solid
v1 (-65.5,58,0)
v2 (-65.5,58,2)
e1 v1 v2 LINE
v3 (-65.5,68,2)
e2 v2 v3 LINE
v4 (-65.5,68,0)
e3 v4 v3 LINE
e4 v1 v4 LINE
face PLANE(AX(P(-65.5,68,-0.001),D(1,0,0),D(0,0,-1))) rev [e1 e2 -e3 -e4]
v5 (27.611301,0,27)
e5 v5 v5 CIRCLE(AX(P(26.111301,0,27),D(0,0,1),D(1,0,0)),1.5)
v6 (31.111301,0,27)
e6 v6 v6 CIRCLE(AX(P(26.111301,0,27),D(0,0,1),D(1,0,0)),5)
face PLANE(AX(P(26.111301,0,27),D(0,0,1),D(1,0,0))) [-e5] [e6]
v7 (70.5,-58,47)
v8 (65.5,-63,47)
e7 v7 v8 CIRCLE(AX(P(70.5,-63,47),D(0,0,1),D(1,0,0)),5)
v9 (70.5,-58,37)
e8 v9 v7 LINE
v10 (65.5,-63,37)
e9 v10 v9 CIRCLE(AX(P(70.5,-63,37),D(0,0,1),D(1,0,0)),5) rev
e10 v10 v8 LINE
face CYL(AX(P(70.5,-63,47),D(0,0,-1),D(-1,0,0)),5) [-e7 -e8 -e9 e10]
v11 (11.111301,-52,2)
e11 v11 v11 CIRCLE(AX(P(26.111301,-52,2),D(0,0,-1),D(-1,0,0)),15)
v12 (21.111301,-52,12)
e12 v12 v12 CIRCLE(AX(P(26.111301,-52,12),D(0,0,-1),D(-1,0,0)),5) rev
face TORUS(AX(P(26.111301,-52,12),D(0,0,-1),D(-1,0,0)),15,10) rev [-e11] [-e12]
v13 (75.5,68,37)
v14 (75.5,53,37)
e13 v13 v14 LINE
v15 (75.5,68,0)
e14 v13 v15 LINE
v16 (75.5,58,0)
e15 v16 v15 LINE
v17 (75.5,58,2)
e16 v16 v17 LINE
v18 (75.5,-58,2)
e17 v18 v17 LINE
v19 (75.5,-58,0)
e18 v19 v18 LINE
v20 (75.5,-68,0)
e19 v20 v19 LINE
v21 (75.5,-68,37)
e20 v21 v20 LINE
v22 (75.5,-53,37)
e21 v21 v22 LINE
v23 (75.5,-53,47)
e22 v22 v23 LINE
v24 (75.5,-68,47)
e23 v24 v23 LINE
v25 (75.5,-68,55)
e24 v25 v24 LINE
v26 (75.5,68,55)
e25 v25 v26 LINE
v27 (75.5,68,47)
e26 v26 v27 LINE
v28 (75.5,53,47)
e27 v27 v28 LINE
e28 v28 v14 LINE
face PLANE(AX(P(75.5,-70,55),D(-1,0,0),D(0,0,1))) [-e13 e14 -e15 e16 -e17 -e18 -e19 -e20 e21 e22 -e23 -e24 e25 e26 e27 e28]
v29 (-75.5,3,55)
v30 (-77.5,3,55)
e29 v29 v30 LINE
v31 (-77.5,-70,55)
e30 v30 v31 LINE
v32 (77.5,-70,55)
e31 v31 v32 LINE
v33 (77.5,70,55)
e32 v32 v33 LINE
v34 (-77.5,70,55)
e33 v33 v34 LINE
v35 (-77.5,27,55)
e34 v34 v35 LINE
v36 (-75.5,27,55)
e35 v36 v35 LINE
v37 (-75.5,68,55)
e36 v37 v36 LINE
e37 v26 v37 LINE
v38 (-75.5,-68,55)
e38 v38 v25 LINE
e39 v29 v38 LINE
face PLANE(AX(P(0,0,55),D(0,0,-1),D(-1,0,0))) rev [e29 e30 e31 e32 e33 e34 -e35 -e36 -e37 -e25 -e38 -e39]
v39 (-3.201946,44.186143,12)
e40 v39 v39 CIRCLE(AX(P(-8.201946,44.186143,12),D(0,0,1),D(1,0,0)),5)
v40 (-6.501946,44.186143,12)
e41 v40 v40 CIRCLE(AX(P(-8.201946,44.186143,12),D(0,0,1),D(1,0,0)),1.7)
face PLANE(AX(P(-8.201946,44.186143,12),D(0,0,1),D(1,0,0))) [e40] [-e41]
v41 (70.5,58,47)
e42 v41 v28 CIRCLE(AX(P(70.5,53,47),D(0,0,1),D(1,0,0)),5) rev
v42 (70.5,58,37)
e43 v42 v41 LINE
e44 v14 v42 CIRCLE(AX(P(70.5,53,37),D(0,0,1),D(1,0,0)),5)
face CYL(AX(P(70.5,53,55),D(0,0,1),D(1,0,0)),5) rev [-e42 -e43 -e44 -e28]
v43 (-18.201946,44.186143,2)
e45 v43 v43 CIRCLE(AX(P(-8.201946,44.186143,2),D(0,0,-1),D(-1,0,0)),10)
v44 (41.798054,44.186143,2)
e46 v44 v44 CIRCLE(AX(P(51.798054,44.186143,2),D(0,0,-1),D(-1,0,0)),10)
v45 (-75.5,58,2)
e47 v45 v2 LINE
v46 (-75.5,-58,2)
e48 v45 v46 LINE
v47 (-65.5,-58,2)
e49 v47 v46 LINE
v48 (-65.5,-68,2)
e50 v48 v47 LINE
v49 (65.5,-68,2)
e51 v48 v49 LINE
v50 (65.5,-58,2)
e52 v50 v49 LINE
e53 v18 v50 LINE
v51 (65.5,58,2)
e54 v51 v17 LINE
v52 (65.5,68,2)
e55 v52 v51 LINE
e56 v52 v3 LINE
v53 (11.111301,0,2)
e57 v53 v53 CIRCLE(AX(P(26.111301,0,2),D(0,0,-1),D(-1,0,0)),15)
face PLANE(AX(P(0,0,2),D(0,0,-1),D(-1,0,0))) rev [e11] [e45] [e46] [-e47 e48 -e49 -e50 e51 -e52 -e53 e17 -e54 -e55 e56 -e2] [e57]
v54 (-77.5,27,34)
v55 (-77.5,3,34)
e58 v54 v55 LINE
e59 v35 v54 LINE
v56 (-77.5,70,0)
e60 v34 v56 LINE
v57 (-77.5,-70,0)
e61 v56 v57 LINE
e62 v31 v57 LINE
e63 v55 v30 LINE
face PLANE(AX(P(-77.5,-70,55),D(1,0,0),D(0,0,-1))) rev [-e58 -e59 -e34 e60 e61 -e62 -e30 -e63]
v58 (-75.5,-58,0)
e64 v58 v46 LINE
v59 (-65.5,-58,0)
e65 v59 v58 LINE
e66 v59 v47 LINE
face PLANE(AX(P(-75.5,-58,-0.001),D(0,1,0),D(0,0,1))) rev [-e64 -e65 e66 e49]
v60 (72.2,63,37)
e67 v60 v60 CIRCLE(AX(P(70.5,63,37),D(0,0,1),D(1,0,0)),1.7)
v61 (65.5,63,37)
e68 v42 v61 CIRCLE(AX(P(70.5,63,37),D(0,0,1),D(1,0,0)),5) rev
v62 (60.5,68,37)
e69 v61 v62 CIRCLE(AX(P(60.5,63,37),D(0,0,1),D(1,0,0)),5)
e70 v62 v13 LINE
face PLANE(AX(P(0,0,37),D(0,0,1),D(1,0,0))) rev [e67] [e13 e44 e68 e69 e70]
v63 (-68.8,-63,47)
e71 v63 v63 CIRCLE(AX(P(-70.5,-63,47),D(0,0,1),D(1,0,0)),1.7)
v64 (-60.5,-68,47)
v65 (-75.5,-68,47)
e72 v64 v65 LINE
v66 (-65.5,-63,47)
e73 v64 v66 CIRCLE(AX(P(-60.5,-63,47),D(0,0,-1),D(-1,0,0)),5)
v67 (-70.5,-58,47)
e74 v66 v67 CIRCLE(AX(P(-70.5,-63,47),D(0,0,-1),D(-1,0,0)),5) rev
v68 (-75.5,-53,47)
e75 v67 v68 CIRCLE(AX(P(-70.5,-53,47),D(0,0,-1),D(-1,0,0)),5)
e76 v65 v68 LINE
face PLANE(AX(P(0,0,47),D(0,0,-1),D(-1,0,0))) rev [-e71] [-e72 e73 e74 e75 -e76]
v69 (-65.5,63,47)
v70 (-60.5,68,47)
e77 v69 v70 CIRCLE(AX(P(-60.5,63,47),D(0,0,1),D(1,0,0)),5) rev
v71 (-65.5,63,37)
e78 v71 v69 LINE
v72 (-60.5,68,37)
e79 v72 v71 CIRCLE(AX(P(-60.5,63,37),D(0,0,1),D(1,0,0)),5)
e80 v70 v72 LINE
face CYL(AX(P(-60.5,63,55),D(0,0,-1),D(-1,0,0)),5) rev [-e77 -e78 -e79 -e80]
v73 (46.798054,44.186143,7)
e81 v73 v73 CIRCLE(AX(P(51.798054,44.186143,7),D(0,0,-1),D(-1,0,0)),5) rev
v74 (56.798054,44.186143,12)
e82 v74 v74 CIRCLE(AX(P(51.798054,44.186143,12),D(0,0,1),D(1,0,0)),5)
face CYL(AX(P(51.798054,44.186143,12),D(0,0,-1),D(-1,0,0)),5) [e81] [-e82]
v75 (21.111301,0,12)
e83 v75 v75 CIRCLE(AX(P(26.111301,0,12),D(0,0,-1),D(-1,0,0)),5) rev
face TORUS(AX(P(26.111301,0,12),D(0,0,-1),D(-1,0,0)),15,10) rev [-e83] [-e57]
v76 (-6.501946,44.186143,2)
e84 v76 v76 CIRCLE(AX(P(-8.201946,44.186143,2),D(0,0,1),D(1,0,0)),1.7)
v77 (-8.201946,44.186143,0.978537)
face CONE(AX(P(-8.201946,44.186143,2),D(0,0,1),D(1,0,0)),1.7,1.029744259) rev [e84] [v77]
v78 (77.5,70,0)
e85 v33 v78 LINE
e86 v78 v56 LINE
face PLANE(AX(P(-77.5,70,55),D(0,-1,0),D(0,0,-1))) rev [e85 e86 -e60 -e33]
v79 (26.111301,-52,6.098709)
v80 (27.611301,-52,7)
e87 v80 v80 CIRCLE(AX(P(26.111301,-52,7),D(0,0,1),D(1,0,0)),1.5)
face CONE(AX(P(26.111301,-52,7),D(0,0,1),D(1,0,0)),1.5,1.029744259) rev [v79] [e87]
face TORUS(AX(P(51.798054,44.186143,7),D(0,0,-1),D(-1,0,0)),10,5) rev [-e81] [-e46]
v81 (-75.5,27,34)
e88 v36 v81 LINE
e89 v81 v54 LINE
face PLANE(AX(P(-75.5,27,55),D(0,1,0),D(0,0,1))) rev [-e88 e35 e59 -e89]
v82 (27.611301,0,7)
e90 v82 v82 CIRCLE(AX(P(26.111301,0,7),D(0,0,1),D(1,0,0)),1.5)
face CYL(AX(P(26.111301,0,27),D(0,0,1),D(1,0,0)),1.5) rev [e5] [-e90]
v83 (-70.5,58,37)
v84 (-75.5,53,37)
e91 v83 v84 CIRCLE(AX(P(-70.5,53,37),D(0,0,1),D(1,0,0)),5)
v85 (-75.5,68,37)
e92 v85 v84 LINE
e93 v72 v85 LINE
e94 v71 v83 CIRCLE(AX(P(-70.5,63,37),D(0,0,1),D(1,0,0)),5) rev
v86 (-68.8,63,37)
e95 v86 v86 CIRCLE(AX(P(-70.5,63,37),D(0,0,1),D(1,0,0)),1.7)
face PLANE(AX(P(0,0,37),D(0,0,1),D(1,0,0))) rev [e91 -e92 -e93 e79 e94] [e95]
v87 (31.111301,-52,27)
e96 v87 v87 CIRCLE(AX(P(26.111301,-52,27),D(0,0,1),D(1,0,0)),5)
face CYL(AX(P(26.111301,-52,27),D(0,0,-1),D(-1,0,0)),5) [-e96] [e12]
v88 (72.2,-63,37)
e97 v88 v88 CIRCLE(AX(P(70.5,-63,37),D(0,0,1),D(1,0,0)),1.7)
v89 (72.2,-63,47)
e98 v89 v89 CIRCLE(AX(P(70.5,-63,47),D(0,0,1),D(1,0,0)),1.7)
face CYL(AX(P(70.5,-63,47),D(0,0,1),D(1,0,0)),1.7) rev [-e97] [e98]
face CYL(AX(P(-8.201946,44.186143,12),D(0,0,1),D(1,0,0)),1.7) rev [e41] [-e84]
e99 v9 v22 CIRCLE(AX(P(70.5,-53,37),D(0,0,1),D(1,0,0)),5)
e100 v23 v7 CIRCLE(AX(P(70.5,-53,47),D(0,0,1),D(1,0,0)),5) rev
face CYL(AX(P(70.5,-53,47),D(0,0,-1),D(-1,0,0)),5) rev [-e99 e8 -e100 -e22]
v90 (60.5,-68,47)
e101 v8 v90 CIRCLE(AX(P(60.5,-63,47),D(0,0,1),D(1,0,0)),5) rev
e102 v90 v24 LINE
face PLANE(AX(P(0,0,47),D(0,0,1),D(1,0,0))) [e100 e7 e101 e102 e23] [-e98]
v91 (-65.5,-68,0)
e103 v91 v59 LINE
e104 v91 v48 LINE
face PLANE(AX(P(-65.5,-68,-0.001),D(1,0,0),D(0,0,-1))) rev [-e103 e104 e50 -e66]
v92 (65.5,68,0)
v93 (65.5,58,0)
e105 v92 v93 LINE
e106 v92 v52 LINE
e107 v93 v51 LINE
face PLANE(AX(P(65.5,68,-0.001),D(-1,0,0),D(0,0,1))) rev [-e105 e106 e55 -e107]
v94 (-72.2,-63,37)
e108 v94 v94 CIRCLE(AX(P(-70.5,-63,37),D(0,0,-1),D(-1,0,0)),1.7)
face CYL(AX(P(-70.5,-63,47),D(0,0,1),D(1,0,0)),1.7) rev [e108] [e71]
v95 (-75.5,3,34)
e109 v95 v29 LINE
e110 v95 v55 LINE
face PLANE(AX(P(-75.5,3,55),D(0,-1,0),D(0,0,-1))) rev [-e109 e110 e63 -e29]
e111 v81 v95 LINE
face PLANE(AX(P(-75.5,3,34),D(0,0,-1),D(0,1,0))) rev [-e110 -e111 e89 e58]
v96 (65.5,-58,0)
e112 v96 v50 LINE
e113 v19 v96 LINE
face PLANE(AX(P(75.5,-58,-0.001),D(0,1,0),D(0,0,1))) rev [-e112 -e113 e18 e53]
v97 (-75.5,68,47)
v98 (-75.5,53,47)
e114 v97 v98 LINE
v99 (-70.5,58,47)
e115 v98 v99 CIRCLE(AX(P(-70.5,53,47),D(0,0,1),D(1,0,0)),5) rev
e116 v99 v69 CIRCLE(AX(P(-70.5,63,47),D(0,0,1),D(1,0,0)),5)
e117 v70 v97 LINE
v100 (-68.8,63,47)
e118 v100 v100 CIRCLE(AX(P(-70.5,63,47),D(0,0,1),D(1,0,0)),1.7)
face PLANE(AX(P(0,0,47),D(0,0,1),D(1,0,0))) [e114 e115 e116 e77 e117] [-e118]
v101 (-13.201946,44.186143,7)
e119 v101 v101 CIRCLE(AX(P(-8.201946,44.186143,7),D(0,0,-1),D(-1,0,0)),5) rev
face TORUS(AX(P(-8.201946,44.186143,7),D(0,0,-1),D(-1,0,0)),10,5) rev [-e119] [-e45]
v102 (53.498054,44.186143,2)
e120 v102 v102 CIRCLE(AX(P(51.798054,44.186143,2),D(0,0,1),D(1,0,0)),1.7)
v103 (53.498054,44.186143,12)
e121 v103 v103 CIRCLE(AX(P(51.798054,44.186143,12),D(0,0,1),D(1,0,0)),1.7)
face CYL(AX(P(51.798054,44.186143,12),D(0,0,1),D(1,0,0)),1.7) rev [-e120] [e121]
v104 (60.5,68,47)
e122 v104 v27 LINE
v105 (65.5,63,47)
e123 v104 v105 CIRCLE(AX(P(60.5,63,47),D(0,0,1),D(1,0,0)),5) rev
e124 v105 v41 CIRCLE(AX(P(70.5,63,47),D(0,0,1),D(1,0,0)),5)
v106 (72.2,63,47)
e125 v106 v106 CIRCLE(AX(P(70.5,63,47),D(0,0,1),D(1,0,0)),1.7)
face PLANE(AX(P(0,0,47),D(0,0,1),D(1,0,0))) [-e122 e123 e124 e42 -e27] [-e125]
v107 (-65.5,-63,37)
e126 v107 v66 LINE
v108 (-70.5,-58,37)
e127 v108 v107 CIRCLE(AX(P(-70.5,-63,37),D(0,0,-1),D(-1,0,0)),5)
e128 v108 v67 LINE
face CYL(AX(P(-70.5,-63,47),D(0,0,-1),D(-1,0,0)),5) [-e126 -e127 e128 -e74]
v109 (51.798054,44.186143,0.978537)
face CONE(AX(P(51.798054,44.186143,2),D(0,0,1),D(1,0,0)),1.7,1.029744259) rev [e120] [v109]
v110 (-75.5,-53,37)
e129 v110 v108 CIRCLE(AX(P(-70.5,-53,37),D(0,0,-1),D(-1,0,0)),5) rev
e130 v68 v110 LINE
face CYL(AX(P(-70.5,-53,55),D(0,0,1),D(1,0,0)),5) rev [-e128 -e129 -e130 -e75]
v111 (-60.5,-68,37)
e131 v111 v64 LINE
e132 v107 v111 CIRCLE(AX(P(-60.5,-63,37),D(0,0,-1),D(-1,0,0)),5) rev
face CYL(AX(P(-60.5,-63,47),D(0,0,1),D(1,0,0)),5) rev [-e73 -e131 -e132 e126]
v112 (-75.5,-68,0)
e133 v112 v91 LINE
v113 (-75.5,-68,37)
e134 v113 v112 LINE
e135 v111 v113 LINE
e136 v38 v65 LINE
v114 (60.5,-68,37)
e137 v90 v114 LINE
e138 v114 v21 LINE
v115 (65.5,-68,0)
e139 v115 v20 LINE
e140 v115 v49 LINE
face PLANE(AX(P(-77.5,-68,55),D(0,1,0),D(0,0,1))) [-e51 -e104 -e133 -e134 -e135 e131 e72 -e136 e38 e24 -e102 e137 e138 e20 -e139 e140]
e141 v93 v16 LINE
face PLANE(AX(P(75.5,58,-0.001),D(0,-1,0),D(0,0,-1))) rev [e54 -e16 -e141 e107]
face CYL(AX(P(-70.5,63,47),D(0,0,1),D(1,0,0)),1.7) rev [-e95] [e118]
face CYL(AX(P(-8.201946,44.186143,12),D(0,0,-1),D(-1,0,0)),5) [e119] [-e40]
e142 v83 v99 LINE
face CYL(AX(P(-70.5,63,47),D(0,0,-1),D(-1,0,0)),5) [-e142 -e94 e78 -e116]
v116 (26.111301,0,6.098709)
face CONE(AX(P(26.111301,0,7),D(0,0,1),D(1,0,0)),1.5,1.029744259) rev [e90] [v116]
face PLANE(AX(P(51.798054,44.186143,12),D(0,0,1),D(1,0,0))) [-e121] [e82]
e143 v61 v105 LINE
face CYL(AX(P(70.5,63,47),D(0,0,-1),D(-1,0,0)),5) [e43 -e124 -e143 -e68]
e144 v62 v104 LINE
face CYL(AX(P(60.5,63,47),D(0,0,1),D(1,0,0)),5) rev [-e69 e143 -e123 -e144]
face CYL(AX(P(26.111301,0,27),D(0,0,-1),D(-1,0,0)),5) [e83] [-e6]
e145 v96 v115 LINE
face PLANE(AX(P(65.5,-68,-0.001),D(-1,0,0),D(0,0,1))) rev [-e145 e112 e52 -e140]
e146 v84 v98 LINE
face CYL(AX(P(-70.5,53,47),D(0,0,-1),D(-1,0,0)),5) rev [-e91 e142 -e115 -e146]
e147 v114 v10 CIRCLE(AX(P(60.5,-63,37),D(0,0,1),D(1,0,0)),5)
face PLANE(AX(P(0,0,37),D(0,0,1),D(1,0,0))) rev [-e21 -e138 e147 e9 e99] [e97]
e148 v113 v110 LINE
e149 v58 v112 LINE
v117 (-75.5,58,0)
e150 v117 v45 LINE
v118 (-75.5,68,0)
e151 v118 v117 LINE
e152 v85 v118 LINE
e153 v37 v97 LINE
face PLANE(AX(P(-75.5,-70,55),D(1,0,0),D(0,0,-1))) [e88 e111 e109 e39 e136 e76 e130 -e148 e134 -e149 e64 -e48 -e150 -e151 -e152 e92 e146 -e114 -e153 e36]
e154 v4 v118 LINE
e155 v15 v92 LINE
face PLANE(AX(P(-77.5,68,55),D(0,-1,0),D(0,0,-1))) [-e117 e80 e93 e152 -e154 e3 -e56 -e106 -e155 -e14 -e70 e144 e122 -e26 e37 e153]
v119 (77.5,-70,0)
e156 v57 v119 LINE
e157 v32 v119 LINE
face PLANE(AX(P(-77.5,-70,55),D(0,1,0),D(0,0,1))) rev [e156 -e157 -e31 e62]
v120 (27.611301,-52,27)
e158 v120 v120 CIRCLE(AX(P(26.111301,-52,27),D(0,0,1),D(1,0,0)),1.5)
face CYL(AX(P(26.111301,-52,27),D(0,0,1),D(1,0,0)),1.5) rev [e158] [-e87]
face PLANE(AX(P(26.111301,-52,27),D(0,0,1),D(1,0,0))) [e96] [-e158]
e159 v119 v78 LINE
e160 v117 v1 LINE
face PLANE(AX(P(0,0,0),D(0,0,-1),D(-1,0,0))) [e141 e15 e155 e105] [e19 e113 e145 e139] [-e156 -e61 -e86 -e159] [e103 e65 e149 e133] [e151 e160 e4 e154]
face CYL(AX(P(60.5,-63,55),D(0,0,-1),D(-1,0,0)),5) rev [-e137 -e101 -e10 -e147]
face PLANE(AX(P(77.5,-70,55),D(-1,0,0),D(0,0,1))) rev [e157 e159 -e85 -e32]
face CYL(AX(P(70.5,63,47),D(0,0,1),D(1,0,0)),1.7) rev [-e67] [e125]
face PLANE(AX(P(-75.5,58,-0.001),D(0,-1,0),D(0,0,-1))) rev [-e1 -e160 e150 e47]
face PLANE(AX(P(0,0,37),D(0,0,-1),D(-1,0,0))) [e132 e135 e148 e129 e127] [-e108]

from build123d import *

# Parameters (mm, degrees)
SKIZZE1_W                            = 155
SKIZZE1_H                            = 140
AUFSATZ_LINEAR_AUSTRAGEN2_DEPTH      = 55
WANDUNG3_T                           = -2
SKIZZE2_W                            = 21
SKIZZE2_H                            = 24
SCHNITT_LINEAR_AUSTRAGEN1_DEPTH      = 2
SKIZZE3_R                            = 5
AUFSATZ_LINEAR_AUSTRAGEN5_DEPTH      = 25
VERRUNDUNG1_R                        = 10
F_3_0_3_DURCHMESSER_BOHRUNG1_D       = 3
F_3_0_3_DURCHMESSER_BOHRUNG1_DEPTH   = 20
F_3_0_3_DURCHMESSER_BOHRUNG1_TIP     = 0.901290929
SCHNITT_LINEAR_AUSTRAGEN2_REACH      = 119.112
SKIZZE6_W                            = 10
SKIZZE6_H                            = 10
AUFSATZ_LINEAR_AUSTRAGEN7_DEPTH      = 10
VERRUNDUNG3_R                        = 5
F_3_4_3_4_DURCHMESSER_BOHRUNG1_D     = 3.4
SKIZZE12_R                           = 5
AUFSATZ_LINEAR_AUSTRAGEN8_DEPTH      = 10
VERRUNDUNG4_R                        = 5
F_3_4_3_4_DURCHMESSER_BOHRUNG2_D     = 3.4
F_3_4_3_4_DURCHMESSER_BOHRUNG2_DEPTH = 10
F_3_4_3_4_DURCHMESSER_BOHRUNG2_TIP   = 1.021463052


with BuildPart() as part:
    # Skizze1 → Aufsatz-Linear austragen2 (new body)
    with BuildSketch(Plane.XY):
        Rectangle(SKIZZE1_W, SKIZZE1_H)
    extrude(amount=AUFSATZ_LINEAR_AUSTRAGEN2_DEPTH)

    # Wandung3
    wandung3_openings = [part.faces().sort_by_distance(p)[0] for p in [
        (0, 0, 55),
    ]]
    offset(amount=WANDUNG3_T, openings=wandung3_openings, kind=Kind.INTERSECTION)

    # Skizze2 → Schnitt-Linear austragen1 (cut)
    with BuildSketch(Plane.ZY.offset(77.5)):
        with Locations((44.5, 15)):
            Rectangle(SKIZZE2_W, SKIZZE2_H)
    extrude(amount=-SCHNITT_LINEAR_AUSTRAGEN1_DEPTH, mode=Mode.SUBTRACT)

    # Skizze3 → Aufsatz-Linear austragen5 (add)
    with BuildSketch(Plane.XY.offset(2)):
        with Locations(Location((26.111301189, -52, 0), (0, 0, 180))):
            Circle(SKIZZE3_R)
        with Locations(Location((26.111301189, 0, 0), (0, 0, 180))):
            Circle(SKIZZE3_R)
    extrude(amount=AUFSATZ_LINEAR_AUSTRAGEN5_DEPTH)

    # Verrundung1
    verrundung1_edges = [part.edges().sort_by_distance(p)[0] for p in [
        (31.111301189, -52, 2),
        (31.111301189, 0, 2),
    ]]
    fillet(verrundung1_edges, radius=VERRUNDUNG1_R)

    # Ø3.0 (3) Durchmesser Bohrung1
    with Locations(Plane.XY.offset(27)):
        with Locations((26.111301189, 0), (26.111301189, -52)):
            Hole(F_3_0_3_DURCHMESSER_BOHRUNG1_D / 2, depth=F_3_0_3_DURCHMESSER_BOHRUNG1_DEPTH)
            with Locations((0, 0, -(F_3_0_3_DURCHMESSER_BOHRUNG1_DEPTH + F_3_0_3_DURCHMESSER_BOHRUNG1_TIP / 2))):  # 118° drill point
                Cone(0, F_3_0_3_DURCHMESSER_BOHRUNG1_D / 2, F_3_0_3_DURCHMESSER_BOHRUNG1_TIP, mode=Mode.SUBTRACT)

    # Skizze6 → Schnitt-Linear austragen2 (cut, up to next)
    with BuildSketch(Plane.XY.offset(2), mode=Mode.PRIVATE) as schnitt_linear_austragen2_sk1:
        with Locations((-70.5, -63)):
            Rectangle(SKIZZE6_W, SKIZZE6_H)
    schnitt_linear_austragen2_tool1 = extrude(schnitt_linear_austragen2_sk1.sketch, amount=-SCHNITT_LINEAR_AUSTRAGEN2_REACH, mode=Mode.PRIVATE) & part.part
    # Skizze6 → Schnitt-Linear austragen2 (cut, up to next)
    with BuildSketch(Plane.XY.offset(2), mode=Mode.PRIVATE) as schnitt_linear_austragen2_sk2:
        with Locations((70.5, -63)):
            Rectangle(SKIZZE6_W, SKIZZE6_H)
    schnitt_linear_austragen2_tool2 = extrude(schnitt_linear_austragen2_sk2.sketch, amount=-SCHNITT_LINEAR_AUSTRAGEN2_REACH, mode=Mode.PRIVATE) & part.part
    # Skizze6 → Schnitt-Linear austragen2 (cut, up to next)
    with BuildSketch(Plane.XY.offset(2), mode=Mode.PRIVATE) as schnitt_linear_austragen2_sk3:
        with Locations((70.5, 63)):
            Rectangle(SKIZZE6_W, SKIZZE6_H)
    schnitt_linear_austragen2_tool3 = extrude(schnitt_linear_austragen2_sk3.sketch, amount=-SCHNITT_LINEAR_AUSTRAGEN2_REACH, mode=Mode.PRIVATE) & part.part
    # Skizze6 → Schnitt-Linear austragen2 (cut, up to next)
    with BuildSketch(Plane.XY.offset(2), mode=Mode.PRIVATE) as schnitt_linear_austragen2_sk4:
        with Locations((-70.5, 63)):
            Rectangle(SKIZZE6_W, SKIZZE6_H)
    schnitt_linear_austragen2_tool4 = extrude(schnitt_linear_austragen2_sk4.sketch, amount=-SCHNITT_LINEAR_AUSTRAGEN2_REACH, mode=Mode.PRIVATE) & part.part
    add(schnitt_linear_austragen2_tool1.solids().sort_by_distance((-70.5, -63, 2))[0], mode=Mode.SUBTRACT)
    add(schnitt_linear_austragen2_tool2.solids().sort_by_distance((70.5, -63, 2))[0], mode=Mode.SUBTRACT)
    add(schnitt_linear_austragen2_tool3.solids().sort_by_distance((70.5, 63, 2))[0], mode=Mode.SUBTRACT)
    add(schnitt_linear_austragen2_tool4.solids().sort_by_distance((-70.5, 63, 2))[0], mode=Mode.SUBTRACT)

    # 3D-Skizze1 → Aufsatz-Linear austragen7 (add)
    with BuildSketch(Plane(origin=(-75.5, 68, 47), x_dir=(0.7430494130276538, -0.6692365574288803, 0), z_dir=(0, 0, 1))):
        Polygon((0, 0), (7.43049413, 6.692365574), (14.122859705, -0.738128556), (6.692365574, -7.43049413), align=None)
        Polygon((112.200461367, 101.054720172), (104.769967237, 94.362354597), (111.462332811, 86.931860467), (118.892826941, 93.624226041), align=None)
        Polygon((203.216633178, 0), (195.786139047, -6.692365574), (189.093773473, 0.738128556), (196.524267603, 7.43049413), align=None)
        Polygon((91.01617181, -101.054720172), (98.446665941, -94.362354597), (91.754300366, -86.931860467), (84.323806236, -93.624226041), align=None)
    extrude(amount=-AUFSATZ_LINEAR_AUSTRAGEN7_DEPTH)

    # Verrundung3
    verrundung3_edges = [part.edges().sort_by_distance(p)[0] for p in [
        (-65.5, -58, 42),
        (-65.5, -68, 42),
        (-75.5, -58, 42),
        (75.5, -58, 42),
        (65.5, -58, 42),
        (65.5, -68, 42),
        (65.5, 58, 42),
        (65.5, 68, 42),
        (75.5, 58, 42),
        (-65.5, 58, 42),
        (-75.5, 58, 42),
        (-65.5, 68, 42),
    ]]
    fillet(verrundung3_edges, radius=VERRUNDUNG3_R - 0.0001)  # a hair under: the kernel refuses the full size

    # Ø3.4 (3.4) Durchmesser Bohrung1 (through all)
    with Locations(Plane.XY.offset(47)):
        with Locations((70.5, 63), (70.5, -63), (-70.5, -63), (-70.5, 63)):
            Hole(F_3_4_3_4_DURCHMESSER_BOHRUNG1_D / 2)

    # Skizze12 → Aufsatz-Linear austragen8 (add)
    with BuildSketch(Plane.XY.offset(2)):
        with Locations(Location((51.798054374, 44.186142646, 0), (0, 0, 180))):
            Circle(SKIZZE12_R)
        with Locations(Location((-8.201945626, 44.186142646, 0), (0, 0, 180))):
            Circle(SKIZZE12_R)
    extrude(amount=AUFSATZ_LINEAR_AUSTRAGEN8_DEPTH)

    # Verrundung4
    verrundung4_edges = [part.edges().sort_by_distance(p)[0] for p in [
        (56.798054374, 44.186142646, 2),
        (-3.201945626, 44.186142646, 2),
    ]]
    fillet(verrundung4_edges, radius=VERRUNDUNG4_R)

    # Ø3.4 (3.4) Durchmesser Bohrung2
    with Locations(Plane.XY.offset(12)):
        with Locations((51.798054374, 44.186142646), (-8.201945626, 44.186142646)):
            Hole(F_3_4_3_4_DURCHMESSER_BOHRUNG2_D / 2, depth=F_3_4_3_4_DURCHMESSER_BOHRUNG2_DEPTH)
            with Locations((0, 0, -(F_3_4_3_4_DURCHMESSER_BOHRUNG2_DEPTH + F_3_4_3_4_DURCHMESSER_BOHRUNG2_TIP / 2))):  # 118° drill point
                Cone(0, F_3_4_3_4_DURCHMESSER_BOHRUNG2_D / 2, F_3_4_3_4_DURCHMESSER_BOHRUNG2_TIP, mode=Mode.SUBTRACT)


solid = part.part
